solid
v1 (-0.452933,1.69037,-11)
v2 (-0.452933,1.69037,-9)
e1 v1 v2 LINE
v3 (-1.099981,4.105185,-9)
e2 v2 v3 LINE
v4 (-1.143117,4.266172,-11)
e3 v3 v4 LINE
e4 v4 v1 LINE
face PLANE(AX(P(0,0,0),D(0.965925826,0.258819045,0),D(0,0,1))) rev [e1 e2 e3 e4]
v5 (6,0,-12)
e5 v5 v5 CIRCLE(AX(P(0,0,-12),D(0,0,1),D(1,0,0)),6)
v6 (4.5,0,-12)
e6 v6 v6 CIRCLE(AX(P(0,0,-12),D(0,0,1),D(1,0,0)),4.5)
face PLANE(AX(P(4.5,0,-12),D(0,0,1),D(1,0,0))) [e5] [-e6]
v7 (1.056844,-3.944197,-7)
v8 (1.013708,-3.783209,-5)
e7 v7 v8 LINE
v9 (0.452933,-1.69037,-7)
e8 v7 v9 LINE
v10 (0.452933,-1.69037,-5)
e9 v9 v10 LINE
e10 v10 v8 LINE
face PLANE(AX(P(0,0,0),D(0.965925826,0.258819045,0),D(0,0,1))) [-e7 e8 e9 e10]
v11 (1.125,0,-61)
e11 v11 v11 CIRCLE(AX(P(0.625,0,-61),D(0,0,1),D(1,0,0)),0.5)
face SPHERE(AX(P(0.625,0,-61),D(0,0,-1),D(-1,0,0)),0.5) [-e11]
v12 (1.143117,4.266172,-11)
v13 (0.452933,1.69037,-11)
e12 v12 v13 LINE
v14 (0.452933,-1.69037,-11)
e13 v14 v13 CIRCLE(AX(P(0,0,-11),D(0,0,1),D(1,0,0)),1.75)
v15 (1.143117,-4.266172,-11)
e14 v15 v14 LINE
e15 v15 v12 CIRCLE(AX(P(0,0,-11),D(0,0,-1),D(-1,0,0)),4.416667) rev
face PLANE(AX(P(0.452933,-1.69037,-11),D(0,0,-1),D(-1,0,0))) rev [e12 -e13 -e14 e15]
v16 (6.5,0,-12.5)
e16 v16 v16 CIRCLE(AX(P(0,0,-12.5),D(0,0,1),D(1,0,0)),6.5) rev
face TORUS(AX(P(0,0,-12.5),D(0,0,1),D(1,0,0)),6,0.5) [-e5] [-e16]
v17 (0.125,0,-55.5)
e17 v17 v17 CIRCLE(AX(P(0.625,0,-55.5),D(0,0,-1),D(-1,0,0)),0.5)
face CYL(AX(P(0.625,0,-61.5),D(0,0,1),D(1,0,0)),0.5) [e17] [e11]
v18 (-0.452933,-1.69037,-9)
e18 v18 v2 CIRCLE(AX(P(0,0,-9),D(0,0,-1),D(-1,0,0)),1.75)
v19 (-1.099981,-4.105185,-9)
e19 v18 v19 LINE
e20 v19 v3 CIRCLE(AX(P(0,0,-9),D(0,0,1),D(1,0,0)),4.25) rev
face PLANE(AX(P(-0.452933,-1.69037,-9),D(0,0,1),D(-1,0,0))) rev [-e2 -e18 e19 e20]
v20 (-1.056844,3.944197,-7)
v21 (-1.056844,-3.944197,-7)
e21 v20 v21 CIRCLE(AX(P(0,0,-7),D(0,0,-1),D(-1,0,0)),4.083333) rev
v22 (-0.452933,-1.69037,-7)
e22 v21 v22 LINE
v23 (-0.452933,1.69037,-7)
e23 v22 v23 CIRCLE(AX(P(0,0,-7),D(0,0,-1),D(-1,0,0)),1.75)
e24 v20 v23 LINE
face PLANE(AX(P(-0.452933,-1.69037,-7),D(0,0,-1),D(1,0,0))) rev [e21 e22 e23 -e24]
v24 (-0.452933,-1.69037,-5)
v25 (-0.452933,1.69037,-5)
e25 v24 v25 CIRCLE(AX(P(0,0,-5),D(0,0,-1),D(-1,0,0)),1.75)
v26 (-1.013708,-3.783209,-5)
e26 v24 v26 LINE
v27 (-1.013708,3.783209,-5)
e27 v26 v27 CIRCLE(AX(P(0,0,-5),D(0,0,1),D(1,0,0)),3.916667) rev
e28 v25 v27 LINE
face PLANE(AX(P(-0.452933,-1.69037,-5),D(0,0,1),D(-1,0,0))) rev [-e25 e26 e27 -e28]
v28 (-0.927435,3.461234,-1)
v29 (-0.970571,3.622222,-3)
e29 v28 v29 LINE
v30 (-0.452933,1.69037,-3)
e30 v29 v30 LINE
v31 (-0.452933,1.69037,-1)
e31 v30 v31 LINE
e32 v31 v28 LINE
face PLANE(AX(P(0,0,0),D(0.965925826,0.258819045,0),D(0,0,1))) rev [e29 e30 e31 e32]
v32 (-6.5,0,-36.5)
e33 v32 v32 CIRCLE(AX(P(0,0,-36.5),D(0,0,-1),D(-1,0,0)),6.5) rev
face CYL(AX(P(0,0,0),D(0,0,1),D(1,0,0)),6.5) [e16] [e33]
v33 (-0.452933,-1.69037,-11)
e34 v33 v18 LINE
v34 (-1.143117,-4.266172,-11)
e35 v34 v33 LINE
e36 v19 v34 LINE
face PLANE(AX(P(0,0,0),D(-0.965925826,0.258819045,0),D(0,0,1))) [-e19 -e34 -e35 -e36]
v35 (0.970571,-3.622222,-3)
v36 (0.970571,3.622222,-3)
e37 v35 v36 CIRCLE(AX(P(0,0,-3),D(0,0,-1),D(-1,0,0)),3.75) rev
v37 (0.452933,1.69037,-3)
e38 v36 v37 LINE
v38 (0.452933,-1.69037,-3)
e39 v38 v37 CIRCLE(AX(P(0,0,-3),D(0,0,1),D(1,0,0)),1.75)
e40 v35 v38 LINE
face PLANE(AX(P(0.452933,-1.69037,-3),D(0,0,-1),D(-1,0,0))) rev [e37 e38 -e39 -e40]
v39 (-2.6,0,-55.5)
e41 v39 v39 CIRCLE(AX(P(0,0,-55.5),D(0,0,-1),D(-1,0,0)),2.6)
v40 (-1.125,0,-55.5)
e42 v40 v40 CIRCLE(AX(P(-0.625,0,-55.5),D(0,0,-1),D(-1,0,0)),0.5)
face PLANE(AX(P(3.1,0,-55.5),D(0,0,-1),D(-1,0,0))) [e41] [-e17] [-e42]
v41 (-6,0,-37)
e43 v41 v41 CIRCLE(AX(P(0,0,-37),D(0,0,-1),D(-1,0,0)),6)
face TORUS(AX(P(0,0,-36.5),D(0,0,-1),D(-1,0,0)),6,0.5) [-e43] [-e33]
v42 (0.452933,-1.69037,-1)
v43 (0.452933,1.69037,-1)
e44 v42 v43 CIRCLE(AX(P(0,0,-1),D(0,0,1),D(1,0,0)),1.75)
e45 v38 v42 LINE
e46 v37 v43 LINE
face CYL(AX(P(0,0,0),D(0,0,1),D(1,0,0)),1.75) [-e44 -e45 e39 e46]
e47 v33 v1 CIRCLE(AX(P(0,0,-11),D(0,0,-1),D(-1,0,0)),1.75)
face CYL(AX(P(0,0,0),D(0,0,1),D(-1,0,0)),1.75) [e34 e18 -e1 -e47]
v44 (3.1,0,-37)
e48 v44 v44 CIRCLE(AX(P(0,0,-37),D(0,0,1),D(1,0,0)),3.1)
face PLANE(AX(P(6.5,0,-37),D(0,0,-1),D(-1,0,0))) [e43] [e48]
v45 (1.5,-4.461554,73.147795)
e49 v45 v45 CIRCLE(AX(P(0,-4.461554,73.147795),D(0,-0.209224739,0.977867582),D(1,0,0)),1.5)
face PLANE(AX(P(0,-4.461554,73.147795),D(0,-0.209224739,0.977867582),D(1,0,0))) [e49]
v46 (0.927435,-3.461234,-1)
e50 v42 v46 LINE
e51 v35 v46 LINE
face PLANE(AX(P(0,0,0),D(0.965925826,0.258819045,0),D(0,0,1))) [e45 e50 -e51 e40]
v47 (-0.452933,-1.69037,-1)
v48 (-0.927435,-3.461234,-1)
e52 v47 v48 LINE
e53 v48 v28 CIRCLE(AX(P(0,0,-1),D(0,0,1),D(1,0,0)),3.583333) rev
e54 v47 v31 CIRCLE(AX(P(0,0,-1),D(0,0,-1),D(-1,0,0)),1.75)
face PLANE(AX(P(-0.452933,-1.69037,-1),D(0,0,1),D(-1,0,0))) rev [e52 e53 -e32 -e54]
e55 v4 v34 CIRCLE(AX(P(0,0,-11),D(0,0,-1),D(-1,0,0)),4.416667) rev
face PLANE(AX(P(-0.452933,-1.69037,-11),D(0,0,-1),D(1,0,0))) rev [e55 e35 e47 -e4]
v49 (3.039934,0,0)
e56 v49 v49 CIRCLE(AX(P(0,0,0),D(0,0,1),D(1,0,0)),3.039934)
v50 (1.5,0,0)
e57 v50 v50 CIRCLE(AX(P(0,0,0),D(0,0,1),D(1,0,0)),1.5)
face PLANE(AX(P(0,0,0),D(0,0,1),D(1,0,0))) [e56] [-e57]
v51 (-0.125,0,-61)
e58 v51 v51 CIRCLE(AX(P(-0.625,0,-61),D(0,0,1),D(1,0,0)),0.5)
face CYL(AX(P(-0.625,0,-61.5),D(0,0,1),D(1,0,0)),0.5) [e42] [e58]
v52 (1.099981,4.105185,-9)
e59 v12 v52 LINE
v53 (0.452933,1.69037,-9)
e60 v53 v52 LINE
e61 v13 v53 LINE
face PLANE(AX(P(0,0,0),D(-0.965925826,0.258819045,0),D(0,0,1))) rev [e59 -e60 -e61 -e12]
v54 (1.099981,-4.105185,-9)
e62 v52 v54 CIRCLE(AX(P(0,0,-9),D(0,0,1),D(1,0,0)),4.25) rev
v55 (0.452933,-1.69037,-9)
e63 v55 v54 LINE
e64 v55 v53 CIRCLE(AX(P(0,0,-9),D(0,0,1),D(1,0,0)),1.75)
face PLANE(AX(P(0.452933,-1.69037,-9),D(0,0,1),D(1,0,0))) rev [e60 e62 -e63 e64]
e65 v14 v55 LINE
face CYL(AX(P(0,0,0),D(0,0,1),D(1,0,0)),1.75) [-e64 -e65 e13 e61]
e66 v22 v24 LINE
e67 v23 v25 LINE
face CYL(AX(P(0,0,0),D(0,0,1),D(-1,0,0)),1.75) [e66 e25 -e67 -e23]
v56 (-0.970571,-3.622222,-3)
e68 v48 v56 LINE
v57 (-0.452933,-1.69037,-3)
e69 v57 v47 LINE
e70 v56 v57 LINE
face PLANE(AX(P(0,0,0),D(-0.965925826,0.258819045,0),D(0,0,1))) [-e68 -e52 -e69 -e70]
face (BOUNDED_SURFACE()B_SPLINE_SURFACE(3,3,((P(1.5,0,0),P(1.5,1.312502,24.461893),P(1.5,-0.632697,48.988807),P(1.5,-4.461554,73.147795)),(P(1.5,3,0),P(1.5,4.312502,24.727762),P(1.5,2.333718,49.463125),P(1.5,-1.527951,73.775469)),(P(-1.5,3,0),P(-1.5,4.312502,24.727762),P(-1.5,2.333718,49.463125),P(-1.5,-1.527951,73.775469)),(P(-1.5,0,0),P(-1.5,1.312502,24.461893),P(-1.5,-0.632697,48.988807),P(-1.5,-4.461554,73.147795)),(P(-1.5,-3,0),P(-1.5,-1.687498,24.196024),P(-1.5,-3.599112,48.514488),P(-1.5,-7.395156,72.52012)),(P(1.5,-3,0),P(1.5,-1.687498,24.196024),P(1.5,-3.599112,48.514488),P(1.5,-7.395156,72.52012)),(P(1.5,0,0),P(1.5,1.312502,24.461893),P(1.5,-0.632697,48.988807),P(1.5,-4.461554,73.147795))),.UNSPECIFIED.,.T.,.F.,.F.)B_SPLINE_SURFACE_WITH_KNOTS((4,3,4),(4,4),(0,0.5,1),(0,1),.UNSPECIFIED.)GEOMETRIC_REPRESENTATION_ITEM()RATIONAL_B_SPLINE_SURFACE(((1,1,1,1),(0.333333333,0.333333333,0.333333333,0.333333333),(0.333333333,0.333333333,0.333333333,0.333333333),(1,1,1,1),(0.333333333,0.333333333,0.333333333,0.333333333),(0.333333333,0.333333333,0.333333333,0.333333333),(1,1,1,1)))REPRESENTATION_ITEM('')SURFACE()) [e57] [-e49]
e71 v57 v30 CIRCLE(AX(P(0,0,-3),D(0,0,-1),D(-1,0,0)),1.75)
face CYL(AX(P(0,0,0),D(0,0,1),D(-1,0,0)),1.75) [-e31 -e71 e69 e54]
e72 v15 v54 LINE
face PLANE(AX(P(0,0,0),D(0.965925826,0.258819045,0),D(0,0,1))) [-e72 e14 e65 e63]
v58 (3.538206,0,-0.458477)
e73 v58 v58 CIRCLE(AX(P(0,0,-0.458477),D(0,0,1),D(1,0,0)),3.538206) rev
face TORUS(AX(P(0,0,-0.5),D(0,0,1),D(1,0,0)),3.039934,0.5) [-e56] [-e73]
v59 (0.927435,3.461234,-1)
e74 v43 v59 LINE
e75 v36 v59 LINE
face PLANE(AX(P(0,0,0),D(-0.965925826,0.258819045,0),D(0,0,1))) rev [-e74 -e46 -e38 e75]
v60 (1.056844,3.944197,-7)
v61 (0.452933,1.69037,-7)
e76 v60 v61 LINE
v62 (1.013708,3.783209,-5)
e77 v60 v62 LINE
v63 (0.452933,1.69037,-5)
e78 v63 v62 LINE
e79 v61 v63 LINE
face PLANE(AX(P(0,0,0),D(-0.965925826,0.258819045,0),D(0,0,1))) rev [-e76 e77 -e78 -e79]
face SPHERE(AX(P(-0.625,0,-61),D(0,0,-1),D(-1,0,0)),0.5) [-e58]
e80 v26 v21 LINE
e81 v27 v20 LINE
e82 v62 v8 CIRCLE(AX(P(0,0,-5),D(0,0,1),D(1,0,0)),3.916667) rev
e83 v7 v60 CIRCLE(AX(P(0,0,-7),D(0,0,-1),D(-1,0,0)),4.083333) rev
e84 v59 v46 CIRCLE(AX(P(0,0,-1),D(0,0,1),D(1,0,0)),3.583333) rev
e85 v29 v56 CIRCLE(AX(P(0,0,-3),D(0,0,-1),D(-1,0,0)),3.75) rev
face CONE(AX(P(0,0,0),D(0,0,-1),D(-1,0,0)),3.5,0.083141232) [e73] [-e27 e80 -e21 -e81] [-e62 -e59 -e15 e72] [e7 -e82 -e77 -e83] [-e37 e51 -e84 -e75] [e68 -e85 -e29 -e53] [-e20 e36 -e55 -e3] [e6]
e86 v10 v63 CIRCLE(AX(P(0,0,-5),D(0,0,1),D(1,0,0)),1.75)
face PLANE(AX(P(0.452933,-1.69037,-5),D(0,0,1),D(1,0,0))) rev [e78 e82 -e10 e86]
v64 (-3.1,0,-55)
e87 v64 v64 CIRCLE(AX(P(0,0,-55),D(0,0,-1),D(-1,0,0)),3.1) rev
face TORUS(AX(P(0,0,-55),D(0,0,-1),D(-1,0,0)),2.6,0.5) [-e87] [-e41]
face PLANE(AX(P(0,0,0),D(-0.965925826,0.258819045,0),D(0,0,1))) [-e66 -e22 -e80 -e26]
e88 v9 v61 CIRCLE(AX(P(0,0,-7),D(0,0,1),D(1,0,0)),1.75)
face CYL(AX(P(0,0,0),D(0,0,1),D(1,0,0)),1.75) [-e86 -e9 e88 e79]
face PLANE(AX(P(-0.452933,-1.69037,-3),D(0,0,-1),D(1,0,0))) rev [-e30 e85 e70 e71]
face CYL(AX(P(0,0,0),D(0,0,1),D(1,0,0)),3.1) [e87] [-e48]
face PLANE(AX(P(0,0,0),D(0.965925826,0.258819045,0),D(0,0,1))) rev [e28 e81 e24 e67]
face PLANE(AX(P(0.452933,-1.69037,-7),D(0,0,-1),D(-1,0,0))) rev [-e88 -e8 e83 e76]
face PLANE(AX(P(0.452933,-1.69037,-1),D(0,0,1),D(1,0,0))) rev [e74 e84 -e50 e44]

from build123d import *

# Parameters (mm, degrees)
SKETCH3_R            = 0.5
BOSS_EXTRUDE1_DEPTH  = 6
FILLET1_R            = 0.5
SKETCH4_R            = 1.5
CUT_REVOLVE1_START   = -11
CUT_REVOLVE1_DEPTH   = 2
CUT_REVOLVE1_START_2 = -7
CUT_REVOLVE1_2_DEPTH = 2
CUT_REVOLVE1_START_3 = -3
CUT_REVOLVE1_3_DEPTH = 2


# Read off the part's stored shape, not the designer's step: Cut-Revolve1
with BuildPart() as part:
    # Sketch2 → Revolve1 (revolve)
    with BuildSketch(Plane(origin=(0, 0, 0), x_dir=(1, 0, 0), z_dir=(0, 1, 0))):
        Polygon((0, 0), (3.5, 0), (4.5, 12), (6.5, 12), (6.5, 37), (3.1, 37), (3.1, 55.5), (0, 55.5), align=None)
    revolve(axis=Axis((0, 0, 0), (0, 0, -1)))

    # Sketch3 → Boss-Extrude1 (add)
    with BuildSketch(Plane(origin=(0, 0, -55.5), x_dir=(-1, 0, 0), z_dir=(0, 0, -1))):
        with Locations((0.625, 0)):
            Circle(SKETCH3_R)
        with Locations((-0.625, 0)):
            Circle(SKETCH3_R)
    extrude(amount=BOSS_EXTRUDE1_DEPTH)

    # Fillet1
    fillet1_edges = [part.edges().sort_by_distance(p)[0] for p in [
        (-0.125, 0, -61.5),
        (1.125, 0, -61.5),
        (-3.1, 0, -55.5),
        (-6.5, 0, -37),
        (-6.5, 0, -12),
        (-3.5, 0, 0),
    ]]
    fillet(fillet1_edges, radius=FILLET1_R)

    # Sweep1: sweep along a path in Sketch5
    with BuildLine() as sweep1_path:  # in the path sketch's own coordinates; laid on its plane below (add() does not lay a ready-made edge on the line's plane)
        add(Edge.make_bspline(
            [(0, 0), (-24.461892785, 1.312502306), (-48.988806649, -0.632697141), (-73.147794593, -4.461553589)],
            knots=[0, 0, 0, 0, 1, 1, 1, 1], degree=3))
    # Sketch4 → Sweep1 (sweep)
    with BuildSketch(Plane.XY):
        Circle(SKETCH4_R)
    sweep(path=Plane(origin=(0, 0, 0), x_dir=(0, 0, -1), z_dir=(1, 0, 0)) * sweep1_path.line)

    # Cut-Revolve1 outline → Cut-Revolve1 (cut)
    with BuildSketch(Plane.XY.offset(CUT_REVOLVE1_START)):
        with BuildLine():
            ThreePointArc((0.452933329, 1.690370196), (1.75, 0), (0.452933329, -1.690370196))
            Line((0.452933329, -1.690370196), (0.970571419, -3.622221849))
            Line((0.970571419, -3.622221849), (1.056844434, -3.944197124))
            Line((1.056844434, -3.944197124), (1.143117449, -4.266172399))
            Line((1.143117449, -4.266172399), (1.607695154, -6))
            Line((1.607695154, -6), (6, -6))
            Line((6, -6), (6, 6))
            Line((6, 6), (1.607695154, 6))
            Line((1.607695154, 6), (1.143117449, 4.266172399))
            Line((1.143117449, 4.266172399), (1.056844434, 3.944197124))
            Line((1.056844434, 3.944197124), (0.970571419, 3.622221849))
            Line((0.970571419, 3.622221849), (0.452933329, 1.690370196))
        make_face()
    cut_revolve1 = extrude(amount=CUT_REVOLVE1_DEPTH, mode=Mode.SUBTRACT)

    # Cut-Revolve1 2 outline → Cut-Revolve1 2 (cut)
    with BuildSketch(Plane.XY.offset(CUT_REVOLVE1_START_2)):
        with BuildLine():
            ThreePointArc((0.452933329, 1.690370196), (1.75, 0), (0.452933329, -1.690370196))
            Line((0.452933329, -1.690370196), (0.970571419, -3.622221849))
            Line((0.970571419, -3.622221849), (1.056844434, -3.944197124))
            Line((1.056844434, -3.944197124), (1.143117449, -4.266172399))
            Line((1.143117449, -4.266172399), (1.607695154, -6))
            Line((1.607695154, -6), (6, -6))
            Line((6, -6), (6, 6))
            Line((6, 6), (1.607695154, 6))
            Line((1.607695154, 6), (1.143117449, 4.266172399))
            Line((1.143117449, 4.266172399), (1.056844434, 3.944197124))
            Line((1.056844434, 3.944197124), (0.970571419, 3.622221849))
            Line((0.970571419, 3.622221849), (0.452933329, 1.690370196))
        make_face()
    cut_revolve1_2 = extrude(amount=CUT_REVOLVE1_2_DEPTH, mode=Mode.SUBTRACT)

    # Cut-Revolve1 3 outline → Cut-Revolve1 3 (cut)
    with BuildSketch(Plane.XY.offset(CUT_REVOLVE1_START_3)):
        with BuildLine():
            ThreePointArc((0.452933329, 1.690370196), (1.75, 0), (0.452933329, -1.690370196))
            Line((0.452933329, -1.690370196), (0.970571419, -3.622221849))
            Line((0.970571419, -3.622221849), (1.056844434, -3.944197124))
            Line((1.056844434, -3.944197124), (1.143117449, -4.266172399))
            Line((1.143117449, -4.266172399), (1.607695154, -6))
            Line((1.607695154, -6), (6, -6))
            Line((6, -6), (6, 6))
            Line((6, 6), (1.607695154, 6))
            Line((1.607695154, 6), (1.143117449, 4.266172399))
            Line((1.143117449, 4.266172399), (1.056844434, 3.944197124))
            Line((1.056844434, 3.944197124), (0.970571419, 3.622221849))
            Line((0.970571419, 3.622221849), (0.452933329, 1.690370196))
        make_face()
    cut_revolve1_3 = extrude(amount=CUT_REVOLVE1_3_DEPTH, mode=Mode.SUBTRACT)

    # Mirror1: Cut-Revolve1, Cut-Revolve1 2, Cut-Revolve1 3 across plane
    add(cut_revolve1.mirror(Plane(origin=(0, 0, 0), x_dir=(0, 0, 1), z_dir=(1, 0, 0))), mode=Mode.SUBTRACT)
    add(cut_revolve1_2.mirror(Plane(origin=(0, 0, 0), x_dir=(0, 0, 1), z_dir=(1, 0, 0))), mode=Mode.SUBTRACT)
    add(cut_revolve1_3.mirror(Plane(origin=(0, 0, 0), x_dir=(0, 0, 1), z_dir=(1, 0, 0))), mode=Mode.SUBTRACT)


solid = part.part
